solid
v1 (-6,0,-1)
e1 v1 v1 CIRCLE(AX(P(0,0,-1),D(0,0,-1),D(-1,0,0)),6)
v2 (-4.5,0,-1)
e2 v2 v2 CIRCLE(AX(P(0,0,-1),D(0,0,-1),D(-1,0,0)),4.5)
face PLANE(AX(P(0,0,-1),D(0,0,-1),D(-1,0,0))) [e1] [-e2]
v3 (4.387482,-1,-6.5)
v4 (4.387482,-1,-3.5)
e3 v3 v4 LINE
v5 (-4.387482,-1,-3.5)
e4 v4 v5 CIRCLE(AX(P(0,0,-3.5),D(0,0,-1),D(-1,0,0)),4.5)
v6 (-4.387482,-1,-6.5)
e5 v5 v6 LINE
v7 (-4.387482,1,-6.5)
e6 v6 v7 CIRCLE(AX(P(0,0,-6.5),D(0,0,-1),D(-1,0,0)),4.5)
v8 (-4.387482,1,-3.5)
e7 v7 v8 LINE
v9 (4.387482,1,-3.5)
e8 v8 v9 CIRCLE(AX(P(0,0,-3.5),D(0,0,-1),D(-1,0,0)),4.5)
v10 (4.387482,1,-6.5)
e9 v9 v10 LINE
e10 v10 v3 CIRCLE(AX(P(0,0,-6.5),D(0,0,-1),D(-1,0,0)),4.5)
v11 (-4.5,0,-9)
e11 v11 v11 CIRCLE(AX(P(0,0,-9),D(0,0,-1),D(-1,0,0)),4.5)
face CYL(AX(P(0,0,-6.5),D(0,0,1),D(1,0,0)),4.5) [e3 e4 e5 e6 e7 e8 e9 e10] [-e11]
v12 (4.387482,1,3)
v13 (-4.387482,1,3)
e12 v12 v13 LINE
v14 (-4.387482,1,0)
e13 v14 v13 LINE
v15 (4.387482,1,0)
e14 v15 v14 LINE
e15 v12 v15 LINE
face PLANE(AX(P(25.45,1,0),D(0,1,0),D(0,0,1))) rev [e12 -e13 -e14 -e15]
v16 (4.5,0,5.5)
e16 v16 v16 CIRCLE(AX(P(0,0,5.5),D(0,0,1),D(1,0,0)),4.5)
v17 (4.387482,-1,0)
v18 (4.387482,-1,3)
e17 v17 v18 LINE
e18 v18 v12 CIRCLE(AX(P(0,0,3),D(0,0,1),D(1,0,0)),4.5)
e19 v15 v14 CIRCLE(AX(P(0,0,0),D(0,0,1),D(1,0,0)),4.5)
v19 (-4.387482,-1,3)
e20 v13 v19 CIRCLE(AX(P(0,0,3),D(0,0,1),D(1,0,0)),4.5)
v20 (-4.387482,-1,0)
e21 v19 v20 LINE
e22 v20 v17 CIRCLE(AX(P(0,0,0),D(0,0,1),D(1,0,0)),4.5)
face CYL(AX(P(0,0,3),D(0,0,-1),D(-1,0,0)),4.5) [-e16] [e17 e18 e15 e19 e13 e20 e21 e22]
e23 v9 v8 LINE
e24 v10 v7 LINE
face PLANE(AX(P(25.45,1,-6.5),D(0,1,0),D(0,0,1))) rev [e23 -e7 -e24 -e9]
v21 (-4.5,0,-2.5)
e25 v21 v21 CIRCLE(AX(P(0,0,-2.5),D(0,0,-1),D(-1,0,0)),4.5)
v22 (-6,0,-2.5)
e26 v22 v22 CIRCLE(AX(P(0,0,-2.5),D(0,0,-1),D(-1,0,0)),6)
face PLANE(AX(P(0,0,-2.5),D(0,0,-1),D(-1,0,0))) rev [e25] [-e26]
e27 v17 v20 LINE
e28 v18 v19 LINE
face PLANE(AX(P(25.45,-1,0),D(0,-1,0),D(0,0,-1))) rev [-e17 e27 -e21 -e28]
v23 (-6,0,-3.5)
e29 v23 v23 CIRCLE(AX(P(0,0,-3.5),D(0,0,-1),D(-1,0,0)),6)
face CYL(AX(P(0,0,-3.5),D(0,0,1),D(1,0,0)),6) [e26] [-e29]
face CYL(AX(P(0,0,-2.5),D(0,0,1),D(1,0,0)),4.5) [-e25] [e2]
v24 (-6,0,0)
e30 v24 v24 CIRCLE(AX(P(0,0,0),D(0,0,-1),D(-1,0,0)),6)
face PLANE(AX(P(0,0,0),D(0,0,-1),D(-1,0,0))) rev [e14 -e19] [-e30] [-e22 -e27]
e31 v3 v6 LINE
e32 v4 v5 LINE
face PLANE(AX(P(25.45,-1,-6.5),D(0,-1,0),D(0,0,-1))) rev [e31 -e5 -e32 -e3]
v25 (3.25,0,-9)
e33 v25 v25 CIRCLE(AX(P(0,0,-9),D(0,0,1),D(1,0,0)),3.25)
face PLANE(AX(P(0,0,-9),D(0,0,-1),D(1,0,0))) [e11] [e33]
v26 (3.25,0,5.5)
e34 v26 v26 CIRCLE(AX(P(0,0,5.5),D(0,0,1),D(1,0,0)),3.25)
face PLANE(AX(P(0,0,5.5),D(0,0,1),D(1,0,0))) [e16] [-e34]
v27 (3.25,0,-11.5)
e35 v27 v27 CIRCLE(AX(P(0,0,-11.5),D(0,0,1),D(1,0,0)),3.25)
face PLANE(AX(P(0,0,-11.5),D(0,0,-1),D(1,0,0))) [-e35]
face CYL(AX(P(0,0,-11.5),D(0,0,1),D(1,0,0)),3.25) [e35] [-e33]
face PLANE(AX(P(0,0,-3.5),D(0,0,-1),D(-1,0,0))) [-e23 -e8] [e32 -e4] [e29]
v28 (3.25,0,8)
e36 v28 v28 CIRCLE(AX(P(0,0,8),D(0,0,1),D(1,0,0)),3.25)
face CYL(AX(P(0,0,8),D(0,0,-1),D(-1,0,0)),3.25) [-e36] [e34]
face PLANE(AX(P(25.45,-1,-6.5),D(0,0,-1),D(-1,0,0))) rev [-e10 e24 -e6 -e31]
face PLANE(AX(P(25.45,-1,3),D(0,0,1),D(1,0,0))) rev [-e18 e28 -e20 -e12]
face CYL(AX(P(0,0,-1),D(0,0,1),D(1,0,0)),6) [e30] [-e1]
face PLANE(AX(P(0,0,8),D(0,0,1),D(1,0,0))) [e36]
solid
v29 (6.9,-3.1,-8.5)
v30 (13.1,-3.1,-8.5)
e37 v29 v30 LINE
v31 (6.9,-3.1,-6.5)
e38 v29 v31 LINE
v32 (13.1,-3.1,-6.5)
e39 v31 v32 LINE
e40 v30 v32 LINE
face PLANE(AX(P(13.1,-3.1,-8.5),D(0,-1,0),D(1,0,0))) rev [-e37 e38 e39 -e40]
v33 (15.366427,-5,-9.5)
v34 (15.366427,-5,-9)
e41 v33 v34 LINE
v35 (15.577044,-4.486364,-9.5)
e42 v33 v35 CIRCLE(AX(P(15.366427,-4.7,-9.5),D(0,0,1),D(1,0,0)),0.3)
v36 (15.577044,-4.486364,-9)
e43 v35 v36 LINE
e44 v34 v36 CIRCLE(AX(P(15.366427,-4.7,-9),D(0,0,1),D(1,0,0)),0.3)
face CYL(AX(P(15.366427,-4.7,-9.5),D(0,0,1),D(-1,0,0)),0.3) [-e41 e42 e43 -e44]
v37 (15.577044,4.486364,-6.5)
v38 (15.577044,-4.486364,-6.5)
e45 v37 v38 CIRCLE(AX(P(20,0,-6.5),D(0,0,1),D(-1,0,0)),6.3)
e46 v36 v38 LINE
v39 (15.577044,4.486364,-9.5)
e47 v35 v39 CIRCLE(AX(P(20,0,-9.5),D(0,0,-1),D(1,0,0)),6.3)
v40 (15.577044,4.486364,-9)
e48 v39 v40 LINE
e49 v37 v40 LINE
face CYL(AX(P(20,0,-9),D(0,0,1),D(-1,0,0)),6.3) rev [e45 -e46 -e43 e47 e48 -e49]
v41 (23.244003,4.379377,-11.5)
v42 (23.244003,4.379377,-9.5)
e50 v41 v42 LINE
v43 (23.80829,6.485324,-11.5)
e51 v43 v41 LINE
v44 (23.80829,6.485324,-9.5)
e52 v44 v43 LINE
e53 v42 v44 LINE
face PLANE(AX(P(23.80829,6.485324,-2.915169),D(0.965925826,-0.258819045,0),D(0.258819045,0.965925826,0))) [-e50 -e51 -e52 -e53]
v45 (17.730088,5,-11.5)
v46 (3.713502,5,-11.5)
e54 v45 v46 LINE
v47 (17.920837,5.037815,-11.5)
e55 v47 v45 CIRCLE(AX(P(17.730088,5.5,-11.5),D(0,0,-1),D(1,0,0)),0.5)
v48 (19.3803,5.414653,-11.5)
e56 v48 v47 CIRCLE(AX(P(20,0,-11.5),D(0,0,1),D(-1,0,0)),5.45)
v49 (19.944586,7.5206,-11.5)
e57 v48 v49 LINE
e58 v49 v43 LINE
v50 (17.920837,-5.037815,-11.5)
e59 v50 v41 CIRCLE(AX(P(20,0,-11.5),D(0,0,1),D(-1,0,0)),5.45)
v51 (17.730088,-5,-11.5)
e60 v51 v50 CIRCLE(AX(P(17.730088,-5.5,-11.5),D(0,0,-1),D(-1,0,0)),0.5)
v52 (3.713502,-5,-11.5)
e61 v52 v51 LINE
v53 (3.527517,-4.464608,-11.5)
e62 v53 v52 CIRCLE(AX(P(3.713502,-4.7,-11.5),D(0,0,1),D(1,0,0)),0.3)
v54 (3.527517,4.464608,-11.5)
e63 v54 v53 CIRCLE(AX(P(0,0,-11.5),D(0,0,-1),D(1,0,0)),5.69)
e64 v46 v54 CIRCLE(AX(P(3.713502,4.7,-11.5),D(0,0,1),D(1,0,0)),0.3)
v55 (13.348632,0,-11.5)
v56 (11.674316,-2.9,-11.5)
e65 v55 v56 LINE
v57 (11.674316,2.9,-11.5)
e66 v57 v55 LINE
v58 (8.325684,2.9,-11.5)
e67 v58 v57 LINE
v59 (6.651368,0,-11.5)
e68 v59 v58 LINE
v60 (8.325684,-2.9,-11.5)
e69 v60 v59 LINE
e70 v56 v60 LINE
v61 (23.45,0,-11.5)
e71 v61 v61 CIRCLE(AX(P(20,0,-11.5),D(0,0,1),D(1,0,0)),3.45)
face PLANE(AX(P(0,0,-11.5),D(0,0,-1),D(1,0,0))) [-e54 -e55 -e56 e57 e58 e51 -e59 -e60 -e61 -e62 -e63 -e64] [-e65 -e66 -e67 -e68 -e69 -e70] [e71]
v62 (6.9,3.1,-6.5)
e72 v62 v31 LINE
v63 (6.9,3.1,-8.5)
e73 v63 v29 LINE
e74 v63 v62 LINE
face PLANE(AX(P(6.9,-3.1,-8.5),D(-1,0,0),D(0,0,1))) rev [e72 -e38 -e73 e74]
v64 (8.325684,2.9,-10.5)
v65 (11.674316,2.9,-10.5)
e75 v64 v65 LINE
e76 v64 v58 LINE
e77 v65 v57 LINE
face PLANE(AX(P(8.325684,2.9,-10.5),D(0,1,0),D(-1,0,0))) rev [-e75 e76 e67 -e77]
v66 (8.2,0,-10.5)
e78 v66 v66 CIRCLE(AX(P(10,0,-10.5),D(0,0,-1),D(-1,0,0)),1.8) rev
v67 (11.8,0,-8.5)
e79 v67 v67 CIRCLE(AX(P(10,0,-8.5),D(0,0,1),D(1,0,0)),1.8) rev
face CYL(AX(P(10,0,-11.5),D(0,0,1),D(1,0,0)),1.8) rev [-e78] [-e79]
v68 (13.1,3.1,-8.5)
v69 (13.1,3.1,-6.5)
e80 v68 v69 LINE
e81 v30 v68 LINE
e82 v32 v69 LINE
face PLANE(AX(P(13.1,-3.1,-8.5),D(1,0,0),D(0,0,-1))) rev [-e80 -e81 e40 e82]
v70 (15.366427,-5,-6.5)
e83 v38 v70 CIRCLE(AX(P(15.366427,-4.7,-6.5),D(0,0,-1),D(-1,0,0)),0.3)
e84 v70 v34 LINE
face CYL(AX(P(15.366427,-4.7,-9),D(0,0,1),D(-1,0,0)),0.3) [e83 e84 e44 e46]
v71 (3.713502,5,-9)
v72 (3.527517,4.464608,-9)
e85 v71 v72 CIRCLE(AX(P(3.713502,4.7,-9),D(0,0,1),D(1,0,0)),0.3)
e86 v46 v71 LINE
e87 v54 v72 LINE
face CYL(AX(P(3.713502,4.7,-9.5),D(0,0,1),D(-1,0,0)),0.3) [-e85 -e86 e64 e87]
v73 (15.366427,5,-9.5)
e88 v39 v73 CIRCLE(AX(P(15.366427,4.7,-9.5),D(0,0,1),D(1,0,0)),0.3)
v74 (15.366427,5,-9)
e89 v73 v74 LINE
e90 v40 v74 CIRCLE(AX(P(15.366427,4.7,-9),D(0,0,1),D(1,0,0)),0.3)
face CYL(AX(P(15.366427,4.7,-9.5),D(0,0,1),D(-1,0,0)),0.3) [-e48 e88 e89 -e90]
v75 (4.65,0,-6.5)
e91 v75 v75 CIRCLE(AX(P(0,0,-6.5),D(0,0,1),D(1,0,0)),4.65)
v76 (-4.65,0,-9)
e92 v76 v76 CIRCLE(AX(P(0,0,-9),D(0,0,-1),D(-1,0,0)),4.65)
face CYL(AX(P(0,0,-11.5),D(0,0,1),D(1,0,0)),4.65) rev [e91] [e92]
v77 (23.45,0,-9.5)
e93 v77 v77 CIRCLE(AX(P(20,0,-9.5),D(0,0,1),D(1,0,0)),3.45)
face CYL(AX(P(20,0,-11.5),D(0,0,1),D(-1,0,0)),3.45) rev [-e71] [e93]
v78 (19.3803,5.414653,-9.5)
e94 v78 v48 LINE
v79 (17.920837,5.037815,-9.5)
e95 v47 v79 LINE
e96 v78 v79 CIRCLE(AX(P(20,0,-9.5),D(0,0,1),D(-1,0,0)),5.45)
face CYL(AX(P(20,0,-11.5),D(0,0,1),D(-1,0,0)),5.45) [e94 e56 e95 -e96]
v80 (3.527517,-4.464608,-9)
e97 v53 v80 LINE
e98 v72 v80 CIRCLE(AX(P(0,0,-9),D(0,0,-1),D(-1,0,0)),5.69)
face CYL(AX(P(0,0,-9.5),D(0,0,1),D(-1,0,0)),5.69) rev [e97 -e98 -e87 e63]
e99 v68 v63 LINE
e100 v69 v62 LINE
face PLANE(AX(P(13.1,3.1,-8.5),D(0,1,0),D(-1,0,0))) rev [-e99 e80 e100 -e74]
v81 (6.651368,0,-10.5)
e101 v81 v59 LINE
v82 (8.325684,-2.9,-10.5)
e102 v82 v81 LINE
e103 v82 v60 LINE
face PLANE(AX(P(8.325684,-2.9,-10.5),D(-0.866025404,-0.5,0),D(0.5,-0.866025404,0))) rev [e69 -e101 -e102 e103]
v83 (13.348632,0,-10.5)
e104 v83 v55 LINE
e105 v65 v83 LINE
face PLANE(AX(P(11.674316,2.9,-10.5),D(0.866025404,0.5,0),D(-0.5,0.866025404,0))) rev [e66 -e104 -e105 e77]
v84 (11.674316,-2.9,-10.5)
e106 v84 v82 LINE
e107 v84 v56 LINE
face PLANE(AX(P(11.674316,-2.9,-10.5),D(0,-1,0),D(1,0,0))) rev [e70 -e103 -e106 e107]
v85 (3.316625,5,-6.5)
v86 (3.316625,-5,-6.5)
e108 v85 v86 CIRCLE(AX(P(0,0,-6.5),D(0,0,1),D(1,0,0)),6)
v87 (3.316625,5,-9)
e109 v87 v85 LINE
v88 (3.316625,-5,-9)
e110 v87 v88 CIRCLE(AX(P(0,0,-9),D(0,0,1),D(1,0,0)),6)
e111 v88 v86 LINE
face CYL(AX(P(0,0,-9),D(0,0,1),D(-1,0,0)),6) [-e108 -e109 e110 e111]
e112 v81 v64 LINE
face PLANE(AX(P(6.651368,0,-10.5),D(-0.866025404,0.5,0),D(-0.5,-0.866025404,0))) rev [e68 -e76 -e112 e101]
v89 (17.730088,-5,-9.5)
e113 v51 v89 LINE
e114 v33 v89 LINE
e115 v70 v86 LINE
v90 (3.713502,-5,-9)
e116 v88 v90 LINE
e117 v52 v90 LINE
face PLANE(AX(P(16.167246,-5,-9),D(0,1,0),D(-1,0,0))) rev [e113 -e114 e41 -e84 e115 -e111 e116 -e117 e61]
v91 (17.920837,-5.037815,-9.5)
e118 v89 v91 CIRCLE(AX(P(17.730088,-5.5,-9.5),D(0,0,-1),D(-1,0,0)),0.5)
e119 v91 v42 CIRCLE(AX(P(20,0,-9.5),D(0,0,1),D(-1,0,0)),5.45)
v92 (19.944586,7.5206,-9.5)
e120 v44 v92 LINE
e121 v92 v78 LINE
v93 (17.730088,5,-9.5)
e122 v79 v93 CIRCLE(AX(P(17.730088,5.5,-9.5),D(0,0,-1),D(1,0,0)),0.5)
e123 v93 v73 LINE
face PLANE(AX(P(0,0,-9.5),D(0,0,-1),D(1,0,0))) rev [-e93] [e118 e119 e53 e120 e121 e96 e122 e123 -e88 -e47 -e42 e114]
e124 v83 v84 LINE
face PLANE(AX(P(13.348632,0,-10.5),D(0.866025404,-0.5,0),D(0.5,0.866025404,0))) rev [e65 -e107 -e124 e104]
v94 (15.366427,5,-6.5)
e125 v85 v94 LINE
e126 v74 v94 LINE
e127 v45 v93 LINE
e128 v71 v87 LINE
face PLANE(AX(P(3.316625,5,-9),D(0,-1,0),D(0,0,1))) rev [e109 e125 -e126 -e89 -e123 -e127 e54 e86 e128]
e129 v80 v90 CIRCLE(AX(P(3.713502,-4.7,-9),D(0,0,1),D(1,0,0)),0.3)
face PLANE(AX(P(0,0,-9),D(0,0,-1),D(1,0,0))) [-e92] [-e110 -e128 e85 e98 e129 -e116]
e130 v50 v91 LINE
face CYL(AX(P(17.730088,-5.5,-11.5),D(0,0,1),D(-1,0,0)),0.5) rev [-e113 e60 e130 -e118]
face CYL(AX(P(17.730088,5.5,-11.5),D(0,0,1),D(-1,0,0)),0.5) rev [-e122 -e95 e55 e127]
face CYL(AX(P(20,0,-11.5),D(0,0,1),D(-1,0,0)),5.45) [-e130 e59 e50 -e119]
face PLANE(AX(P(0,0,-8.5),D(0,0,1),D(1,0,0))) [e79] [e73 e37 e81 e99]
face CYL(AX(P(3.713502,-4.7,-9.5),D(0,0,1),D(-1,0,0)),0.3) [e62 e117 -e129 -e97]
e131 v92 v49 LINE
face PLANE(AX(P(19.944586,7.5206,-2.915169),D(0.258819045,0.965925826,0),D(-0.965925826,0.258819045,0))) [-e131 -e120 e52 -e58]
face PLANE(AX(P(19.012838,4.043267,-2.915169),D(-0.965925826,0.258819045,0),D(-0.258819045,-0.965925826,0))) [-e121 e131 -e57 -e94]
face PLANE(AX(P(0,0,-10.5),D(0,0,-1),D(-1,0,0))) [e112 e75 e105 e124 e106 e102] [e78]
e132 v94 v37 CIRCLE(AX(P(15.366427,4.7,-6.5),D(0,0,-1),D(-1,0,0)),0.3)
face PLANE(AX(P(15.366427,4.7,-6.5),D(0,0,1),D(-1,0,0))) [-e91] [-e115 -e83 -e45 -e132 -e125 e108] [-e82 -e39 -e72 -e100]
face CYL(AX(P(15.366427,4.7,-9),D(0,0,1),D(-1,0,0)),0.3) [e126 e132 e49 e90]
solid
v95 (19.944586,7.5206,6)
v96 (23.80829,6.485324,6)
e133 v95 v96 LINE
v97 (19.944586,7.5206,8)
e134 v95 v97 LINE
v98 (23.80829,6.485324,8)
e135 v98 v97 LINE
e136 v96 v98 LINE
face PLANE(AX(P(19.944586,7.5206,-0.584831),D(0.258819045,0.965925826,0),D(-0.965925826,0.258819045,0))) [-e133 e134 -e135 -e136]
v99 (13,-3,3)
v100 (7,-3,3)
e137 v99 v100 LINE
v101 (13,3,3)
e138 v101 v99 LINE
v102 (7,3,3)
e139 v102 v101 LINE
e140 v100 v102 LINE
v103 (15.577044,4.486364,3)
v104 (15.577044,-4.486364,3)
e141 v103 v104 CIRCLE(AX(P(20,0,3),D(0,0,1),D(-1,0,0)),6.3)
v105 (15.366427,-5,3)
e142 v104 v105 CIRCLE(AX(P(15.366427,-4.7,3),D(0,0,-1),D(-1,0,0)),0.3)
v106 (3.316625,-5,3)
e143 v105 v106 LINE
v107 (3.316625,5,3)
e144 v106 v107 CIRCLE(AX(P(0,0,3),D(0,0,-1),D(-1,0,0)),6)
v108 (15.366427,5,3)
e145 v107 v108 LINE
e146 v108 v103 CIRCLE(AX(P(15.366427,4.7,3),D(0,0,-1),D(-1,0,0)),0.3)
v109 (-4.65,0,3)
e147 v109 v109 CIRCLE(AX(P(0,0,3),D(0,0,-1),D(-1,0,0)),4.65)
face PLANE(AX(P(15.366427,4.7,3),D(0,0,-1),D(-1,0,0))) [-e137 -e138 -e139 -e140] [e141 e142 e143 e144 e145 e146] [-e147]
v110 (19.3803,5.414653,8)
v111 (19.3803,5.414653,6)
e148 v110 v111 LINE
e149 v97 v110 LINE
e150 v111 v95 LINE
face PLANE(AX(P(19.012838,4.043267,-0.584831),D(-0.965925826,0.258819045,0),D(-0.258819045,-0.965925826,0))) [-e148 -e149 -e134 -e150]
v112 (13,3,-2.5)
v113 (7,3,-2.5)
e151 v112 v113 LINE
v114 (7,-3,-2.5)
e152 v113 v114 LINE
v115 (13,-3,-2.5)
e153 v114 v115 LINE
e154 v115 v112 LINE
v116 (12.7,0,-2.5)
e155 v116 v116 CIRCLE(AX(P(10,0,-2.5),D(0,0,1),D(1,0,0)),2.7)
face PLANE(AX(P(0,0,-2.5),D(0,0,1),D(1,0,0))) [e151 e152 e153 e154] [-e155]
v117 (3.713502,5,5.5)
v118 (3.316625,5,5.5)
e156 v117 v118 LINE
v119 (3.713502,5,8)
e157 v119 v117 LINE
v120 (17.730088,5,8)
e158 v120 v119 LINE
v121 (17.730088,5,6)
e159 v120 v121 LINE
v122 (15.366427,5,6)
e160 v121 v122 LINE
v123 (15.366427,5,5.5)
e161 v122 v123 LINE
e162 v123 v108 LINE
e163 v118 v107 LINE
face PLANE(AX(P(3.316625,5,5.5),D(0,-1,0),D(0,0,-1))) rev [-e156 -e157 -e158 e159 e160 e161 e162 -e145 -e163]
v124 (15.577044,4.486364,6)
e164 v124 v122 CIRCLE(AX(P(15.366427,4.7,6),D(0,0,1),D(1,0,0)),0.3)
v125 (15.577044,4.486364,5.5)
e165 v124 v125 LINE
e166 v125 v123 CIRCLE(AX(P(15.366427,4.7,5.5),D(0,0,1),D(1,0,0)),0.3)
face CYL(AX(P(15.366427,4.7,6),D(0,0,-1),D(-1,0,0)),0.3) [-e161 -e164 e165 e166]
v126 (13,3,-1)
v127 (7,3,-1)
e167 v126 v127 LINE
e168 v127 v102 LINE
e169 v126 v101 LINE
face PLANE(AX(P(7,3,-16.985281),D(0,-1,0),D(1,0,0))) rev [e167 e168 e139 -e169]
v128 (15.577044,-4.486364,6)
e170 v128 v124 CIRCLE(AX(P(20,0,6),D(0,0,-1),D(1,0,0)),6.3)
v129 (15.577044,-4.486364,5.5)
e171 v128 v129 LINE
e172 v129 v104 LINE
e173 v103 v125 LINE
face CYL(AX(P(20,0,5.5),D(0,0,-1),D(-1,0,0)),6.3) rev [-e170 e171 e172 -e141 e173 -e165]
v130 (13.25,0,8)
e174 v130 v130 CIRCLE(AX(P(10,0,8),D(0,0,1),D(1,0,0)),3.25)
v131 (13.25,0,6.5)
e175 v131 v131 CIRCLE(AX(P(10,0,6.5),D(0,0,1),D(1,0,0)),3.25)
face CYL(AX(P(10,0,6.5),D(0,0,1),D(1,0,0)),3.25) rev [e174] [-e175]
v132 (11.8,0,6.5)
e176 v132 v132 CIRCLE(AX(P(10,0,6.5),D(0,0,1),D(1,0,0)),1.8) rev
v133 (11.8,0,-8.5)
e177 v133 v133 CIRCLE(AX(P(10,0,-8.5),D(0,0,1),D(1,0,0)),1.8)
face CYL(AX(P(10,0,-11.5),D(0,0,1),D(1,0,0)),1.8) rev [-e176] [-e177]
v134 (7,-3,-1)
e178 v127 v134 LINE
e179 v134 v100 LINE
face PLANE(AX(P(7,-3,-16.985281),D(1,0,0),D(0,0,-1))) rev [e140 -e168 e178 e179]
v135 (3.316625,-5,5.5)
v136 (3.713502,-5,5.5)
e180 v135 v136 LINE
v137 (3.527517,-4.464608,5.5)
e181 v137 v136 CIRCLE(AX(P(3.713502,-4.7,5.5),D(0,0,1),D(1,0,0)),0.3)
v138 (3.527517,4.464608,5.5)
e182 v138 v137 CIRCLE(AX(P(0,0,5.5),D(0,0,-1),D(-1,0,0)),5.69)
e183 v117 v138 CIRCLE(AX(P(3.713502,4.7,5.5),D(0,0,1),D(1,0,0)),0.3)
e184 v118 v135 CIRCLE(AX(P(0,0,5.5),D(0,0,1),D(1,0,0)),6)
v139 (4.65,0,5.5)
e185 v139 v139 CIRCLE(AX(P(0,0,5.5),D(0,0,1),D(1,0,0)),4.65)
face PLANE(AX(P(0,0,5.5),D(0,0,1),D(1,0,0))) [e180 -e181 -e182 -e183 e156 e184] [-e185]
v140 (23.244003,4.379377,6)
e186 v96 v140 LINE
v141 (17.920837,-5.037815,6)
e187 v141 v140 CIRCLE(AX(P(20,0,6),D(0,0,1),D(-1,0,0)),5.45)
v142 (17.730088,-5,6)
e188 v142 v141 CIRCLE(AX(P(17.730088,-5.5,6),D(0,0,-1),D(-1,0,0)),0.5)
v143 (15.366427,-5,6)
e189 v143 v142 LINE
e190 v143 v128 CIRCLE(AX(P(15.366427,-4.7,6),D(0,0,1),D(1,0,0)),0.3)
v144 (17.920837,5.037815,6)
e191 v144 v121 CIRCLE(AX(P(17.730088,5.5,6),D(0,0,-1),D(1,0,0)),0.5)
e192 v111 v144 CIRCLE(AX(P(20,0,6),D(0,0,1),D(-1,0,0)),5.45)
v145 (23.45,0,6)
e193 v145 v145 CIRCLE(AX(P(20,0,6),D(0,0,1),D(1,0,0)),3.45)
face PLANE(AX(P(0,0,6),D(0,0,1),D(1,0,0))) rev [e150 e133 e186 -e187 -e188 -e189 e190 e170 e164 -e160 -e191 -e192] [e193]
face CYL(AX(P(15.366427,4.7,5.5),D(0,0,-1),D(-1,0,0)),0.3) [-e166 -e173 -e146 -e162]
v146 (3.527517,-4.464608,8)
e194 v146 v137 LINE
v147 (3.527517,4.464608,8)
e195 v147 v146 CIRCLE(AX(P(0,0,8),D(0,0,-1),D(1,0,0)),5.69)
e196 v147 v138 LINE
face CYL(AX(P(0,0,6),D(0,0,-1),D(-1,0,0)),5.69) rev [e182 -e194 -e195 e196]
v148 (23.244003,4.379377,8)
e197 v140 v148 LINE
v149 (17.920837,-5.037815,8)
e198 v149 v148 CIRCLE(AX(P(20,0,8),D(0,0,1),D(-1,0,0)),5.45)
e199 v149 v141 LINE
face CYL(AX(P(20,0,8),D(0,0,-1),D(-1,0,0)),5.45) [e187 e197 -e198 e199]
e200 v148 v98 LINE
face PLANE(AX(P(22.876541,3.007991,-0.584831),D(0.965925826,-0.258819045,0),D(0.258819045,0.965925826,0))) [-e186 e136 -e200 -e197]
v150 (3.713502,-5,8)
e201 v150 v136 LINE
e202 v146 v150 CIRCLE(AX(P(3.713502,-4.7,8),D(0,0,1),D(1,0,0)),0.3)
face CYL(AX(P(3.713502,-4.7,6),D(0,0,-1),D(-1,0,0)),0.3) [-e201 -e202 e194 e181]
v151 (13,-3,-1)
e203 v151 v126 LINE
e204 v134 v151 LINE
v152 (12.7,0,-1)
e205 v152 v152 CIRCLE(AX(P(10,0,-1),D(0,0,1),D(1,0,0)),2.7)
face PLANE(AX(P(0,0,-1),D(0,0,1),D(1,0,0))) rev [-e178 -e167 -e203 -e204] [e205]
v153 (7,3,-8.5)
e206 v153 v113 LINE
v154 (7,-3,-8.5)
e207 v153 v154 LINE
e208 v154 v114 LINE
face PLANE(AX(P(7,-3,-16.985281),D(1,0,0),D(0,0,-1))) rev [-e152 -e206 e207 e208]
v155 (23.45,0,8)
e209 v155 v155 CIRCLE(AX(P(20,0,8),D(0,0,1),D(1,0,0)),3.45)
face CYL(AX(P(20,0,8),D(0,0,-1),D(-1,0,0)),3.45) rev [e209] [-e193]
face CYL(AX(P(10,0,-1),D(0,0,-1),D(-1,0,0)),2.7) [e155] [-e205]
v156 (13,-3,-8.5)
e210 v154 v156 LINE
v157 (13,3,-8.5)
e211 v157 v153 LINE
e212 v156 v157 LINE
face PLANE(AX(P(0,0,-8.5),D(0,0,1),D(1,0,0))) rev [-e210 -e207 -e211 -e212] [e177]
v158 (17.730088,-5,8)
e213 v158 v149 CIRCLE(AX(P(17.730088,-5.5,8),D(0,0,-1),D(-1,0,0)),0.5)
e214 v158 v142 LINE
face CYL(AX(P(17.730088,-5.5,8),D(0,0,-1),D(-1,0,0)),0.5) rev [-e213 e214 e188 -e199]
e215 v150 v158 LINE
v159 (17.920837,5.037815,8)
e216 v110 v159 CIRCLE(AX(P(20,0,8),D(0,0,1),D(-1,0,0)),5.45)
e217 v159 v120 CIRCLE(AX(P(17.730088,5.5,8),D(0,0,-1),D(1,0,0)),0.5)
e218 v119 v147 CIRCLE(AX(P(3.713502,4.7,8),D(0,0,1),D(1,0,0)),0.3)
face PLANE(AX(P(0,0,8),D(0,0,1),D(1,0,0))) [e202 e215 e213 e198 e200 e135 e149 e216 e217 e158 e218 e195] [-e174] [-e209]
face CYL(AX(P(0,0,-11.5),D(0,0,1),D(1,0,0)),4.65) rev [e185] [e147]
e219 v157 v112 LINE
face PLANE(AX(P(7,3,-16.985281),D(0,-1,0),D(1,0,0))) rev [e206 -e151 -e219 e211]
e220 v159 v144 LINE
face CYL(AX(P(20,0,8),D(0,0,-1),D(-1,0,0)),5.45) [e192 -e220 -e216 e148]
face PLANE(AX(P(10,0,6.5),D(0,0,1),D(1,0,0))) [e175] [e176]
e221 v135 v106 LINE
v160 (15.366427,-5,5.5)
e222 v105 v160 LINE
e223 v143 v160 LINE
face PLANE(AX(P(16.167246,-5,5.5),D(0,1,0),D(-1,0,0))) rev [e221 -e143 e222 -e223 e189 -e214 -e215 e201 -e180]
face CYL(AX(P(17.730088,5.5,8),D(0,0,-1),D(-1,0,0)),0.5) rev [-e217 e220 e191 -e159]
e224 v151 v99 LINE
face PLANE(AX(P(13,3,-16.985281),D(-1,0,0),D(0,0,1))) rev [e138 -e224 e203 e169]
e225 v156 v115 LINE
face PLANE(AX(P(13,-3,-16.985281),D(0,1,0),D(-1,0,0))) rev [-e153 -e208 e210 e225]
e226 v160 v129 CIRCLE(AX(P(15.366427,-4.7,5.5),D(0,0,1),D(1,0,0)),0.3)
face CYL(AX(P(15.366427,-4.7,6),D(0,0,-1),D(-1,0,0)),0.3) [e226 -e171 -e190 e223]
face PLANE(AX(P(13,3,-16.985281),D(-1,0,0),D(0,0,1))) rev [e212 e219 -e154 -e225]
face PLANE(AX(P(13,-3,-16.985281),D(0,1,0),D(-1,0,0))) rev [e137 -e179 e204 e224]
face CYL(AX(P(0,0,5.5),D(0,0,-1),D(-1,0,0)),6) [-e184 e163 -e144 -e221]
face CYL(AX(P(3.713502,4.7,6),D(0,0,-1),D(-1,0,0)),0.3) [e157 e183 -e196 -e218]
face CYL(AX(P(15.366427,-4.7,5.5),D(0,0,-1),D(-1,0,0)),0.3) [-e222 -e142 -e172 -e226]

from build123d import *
from build123d.topology import SkipClean

# Parameters (mm, degrees)
SKETCH_1_R                   = 4.5
EXTRUDE_1_DEPTH              = 3
SKETCH_2_R                   = 6
EXTRUDE_2_DEPTH              = 1
EXTRUDE_START                = 1.5
SKETCH_3_R                   = 4.5
EXTRUDE_3_DEPTH              = 1.5
SKETCH_4_R                   = 6
EXTRUDE_4_DEPTH              = 1
EXTRUDE_START_2              = 3
SKETCH_5_R                   = 4.5
EXTRUDE_5_DEPTH              = 3
SKETCH_6_R                   = 6
EXTRUDE_6_DEPTH              = 1
EXTRUDE_START_3              = 1
SKETCH_7_R                   = 6
EXTRUDE_7_DEPTH              = 1
SKETCH_10_R                  = 4.25
EXTRUDE_10_DEPTH             = 1.5
SKETCH_11_R                  = 3.25
EXTRUDE_11_DEPTH             = 2.5
SKETCH_12_R                  = 4.39
EXTRUDE_12_DEPTH             = 1.5
EXTRUDE_13_DEPTH             = 0.5
FILLET_START                 = 3
FILLET_9_DEPTH               = 2.5
SKETCH_14_R                  = 3.45
EXTRUDE_14_DEPTH             = 2
EXTRUDE_15_DEPTH             = 1
SKETCH_16_R                  = 1.8
CUT_EXTRUDE_1_DEPTH          = 33.61828475
SKETCH_17_W                  = 6.2
SKETCH_17_H                  = 6.2
CUT_EXTRUDE_2_DEPTH          = 2
SKETCH_18_W                  = 6
SKETCH_18_H                  = 6
EXTRUDE_16_DEPTH             = 11.5
SKETCH_19_R                  = 1.8
CUT_EXTRUDE_3_DEPTH          = 30.899038446
CUT_EXTRUDE_4_DEPTH          = 0.75
CUT_EXTRUDE_4_DEPTH_BACK     = 0.75
SKETCH_20_W                  = 6
SKETCH_20_H                  = 6
SKETCH_20_R                  = 2.7
SKETCH_21_R                  = 3.25
CUT_EXTRUDE_5_DEPTH          = 1.5
CUT_EXTRUDE_6_DEPTH          = 1
EXTRUDE_17_DEPTH             = 2
EXTRUDE_18_DEPTH             = 2
SKETCH_26_R                  = 6
SKETCH_26_R_2                = 5.8
CUT_EXTRUDE_8_DEPTH          = 31.240898289
SKETCH_27_R                  = 6
SKETCH_27_R_2                = 5.8
CUT_EXTRUDE_9_DEPTH          = 31.240898289
SKETCH_28_R                  = 5.8
SKETCH_28_R_2                = 4.25
CUT_EXTRUDE_10_DEPTH         = 1
CUT_EXTRUDE_START            = 1
SKETCH_29_R                  = 5.8
SKETCH_29_R_2                = 4.25
CUT_EXTRUDE_11_DEPTH         = 1
SKETCH_30_R                  = 4.39
EXTRUDE_19_DEPTH             = 1
SKETCH_31_R                  = 4.39
EXTRUDE_20_DEPTH             = 1
CUT_EXTRUDE_START_2          = -14.5
CUT_EXTRUDE_12_OUTLINE_R     = 4.65
CUT_EXTRUDE_12_OUTLINE_R_2   = 4.39
CUT_EXTRUDE_12_DEPTH         = 2.5
CUT_EXTRUDE_START_3          = -2.5
CUT_EXTRUDE_12_2_OUTLINE_R   = 4.65
CUT_EXTRUDE_12_2_OUTLINE_R_2 = 4.39
CUT_EXTRUDE_12_2_DEPTH       = 2.5
SKETCH_33_R                  = 4.5
SKETCH_33_R_2                = 4.25
EXTRUDE_21_DEPTH             = 2.5
EXTRUDE_START_4              = 2.5
SKETCH_34_R                  = 4.5
SKETCH_34_R_2                = 4.25
EXTRUDE_22_DEPTH             = 2.5
SKETCH_25_W                  = 3
SKETCH_25_H                  = 2
CUT_EXTRUDE_13_DEPTH         = 33.951660494


with BuildPart() as part:
    # ｽｹｯﾁ1 → ﾎﾞｽ - 押し出し1 (new body)
    with BuildSketch(Plane.XY):
        Circle(SKETCH_1_R)
    extrude(amount=EXTRUDE_1_DEPTH)

    # ｽｹｯﾁ2 → ﾎﾞｽ - 押し出し2 (add)
    with BuildSketch(Plane(origin=(0, 0, 0), x_dir=(-1, 0, 0), z_dir=(0, 0, -1))):
        Circle(SKETCH_2_R)
    extrude(amount=EXTRUDE_2_DEPTH)

    # ｽｹｯﾁ3 → ﾎﾞｽ - 押し出し3 (add)
    with BuildSketch(Plane(origin=(0, 0, -1), x_dir=(-1, 0, 0), z_dir=(0, 0, -1)).offset(EXTRUDE_START)):
        with Locations(Location((0, 0, 0), (0, 0, 180))):
            Circle(SKETCH_3_R)
    extrude(amount=-EXTRUDE_3_DEPTH)

    # ｽｹｯﾁ4 → ﾎﾞｽ - 押し出し4 (add)
    with BuildSketch(Plane(origin=(0, 0, -2.5), x_dir=(-1, 0, 0), z_dir=(0, 0, -1))):
        Circle(SKETCH_4_R)
    extrude(amount=EXTRUDE_4_DEPTH)

    # ｽｹｯﾁ5 → ﾎﾞｽ - 押し出し5 (add)
    with BuildSketch(Plane(origin=(0, 0, -3.5), x_dir=(-1, 0, 0), z_dir=(0, 0, -1)).offset(EXTRUDE_START_2)):
        with Locations(Location((0, 0, 0), (0, 0, 180))):
            Circle(SKETCH_5_R)
    extrude(amount=-EXTRUDE_5_DEPTH)

    # ｽｹｯﾁ6 → ﾎﾞｽ - 押し出し6 (add)
    with BuildSketch(Plane(origin=(0, 0, -6.5), x_dir=(-1, 0, 0), z_dir=(0, 0, -1))):
        Circle(SKETCH_6_R)
    extrude(amount=EXTRUDE_6_DEPTH)

    # ｽｹｯﾁ7 → ﾎﾞｽ - 押し出し7 (add)
    with BuildSketch(Plane.XY.offset(3).offset(EXTRUDE_START_3)):
        with Locations(Location((0, 0, 0), (0, 0, 180))):
            Circle(SKETCH_7_R)
    extrude(amount=-EXTRUDE_7_DEPTH)

    # ｽｹｯﾁ10 → ﾎﾞｽ - 押し出し10 (add)
    with BuildSketch(Plane.XY.offset(4)):
        Circle(SKETCH_10_R)
    extrude_10 = extrude(amount=EXTRUDE_10_DEPTH)

    # ｽｹｯﾁ11 → ﾎﾞｽ - 押し出し11 (add)
    with BuildSketch(Plane.XY.offset(5.5)):
        Circle(SKETCH_11_R)
    extrude_11 = extrude(amount=EXTRUDE_11_DEPTH)

    # ﾐﾗｰ1: ﾎﾞｽ - 押し出し10, ﾎﾞｽ - 押し出し11 across plane
    add(extrude_10.mirror(Plane.XY.offset(-1.75)))
    add(extrude_11.mirror(Plane.XY.offset(-1.75)))

    # ｽｹｯﾁ26 → ｶｯﾄ - 押し出し8 (cut, through all)
    with BuildSketch(Plane(origin=(0, 0, 3), x_dir=(-1, 0, 0), z_dir=(0, 0, -1))):
        Circle(SKETCH_26_R)
        Circle(SKETCH_26_R_2, mode=Mode.SUBTRACT)
    extrude(amount=-CUT_EXTRUDE_8_DEPTH, mode=Mode.SUBTRACT)

    # ｽｹｯﾁ27 → ｶｯﾄ - 押し出し9 (cut, through all)
    with BuildSketch(Plane.XY.offset(-6.5)):
        with Locations(Location((0, 0, 0), (0, 0, 180))):
            Circle(SKETCH_27_R)
        with Locations(Location((0, 0, 0), (0, 0, 180))):
            Circle(SKETCH_27_R_2, mode=Mode.SUBTRACT)
    extrude(amount=-CUT_EXTRUDE_9_DEPTH, mode=Mode.SUBTRACT)

    # ｽｹｯﾁ28 → ｶｯﾄ - 押し出し10 (cut)
    with BuildSketch(Plane(origin=(0, 0, 4), x_dir=(-1, 0, 0), z_dir=(0, 0, -1))):
        with Locations(Location((0, 0, 0), (0, 0, 180))):
            Circle(SKETCH_28_R)
        with Locations(Location((0, 0, 0), (0, 0, 180))):
            Circle(SKETCH_28_R_2, mode=Mode.SUBTRACT)
    extrude(amount=CUT_EXTRUDE_10_DEPTH, mode=Mode.SUBTRACT)

    # ｽｹｯﾁ29 → ｶｯﾄ - 押し出し11 (cut)
    with BuildSketch(Plane.XY.offset(-7.5).offset(CUT_EXTRUDE_START)):
        Circle(SKETCH_29_R)
        with Locations(Location((0, 0, 0), (0, 0, 180))):
            Circle(SKETCH_29_R_2, mode=Mode.SUBTRACT)
    extrude(amount=-CUT_EXTRUDE_11_DEPTH, mode=Mode.SUBTRACT)

    # ｽｹｯﾁ33 → ﾎﾞｽ - 押し出し21 (add)
    with BuildSketch(Plane.XY.offset(3)):
        Circle(SKETCH_33_R)
        Circle(SKETCH_33_R_2, mode=Mode.SUBTRACT)
    extrude(amount=EXTRUDE_21_DEPTH)

    # ｽｹｯﾁ34 → ﾎﾞｽ - 押し出し22 (add)
    with BuildSketch(Plane(origin=(0, 0, -6.5), x_dir=(-1, 0, 0), z_dir=(0, 0, -1)).offset(EXTRUDE_START_4)):
        with Locations(Location((0, 0, 0), (0, 0, 180))):
            Circle(SKETCH_34_R)
        Circle(SKETCH_34_R_2, mode=Mode.SUBTRACT)
    extrude(amount=-EXTRUDE_22_DEPTH)

    # ｽｹｯﾁ25 → ｶｯﾄ - 押し出し13 (cut, through all)
    with BuildSketch(Plane.ZY.offset(4.5)):
        with Locations((-5, 0)):
            Rectangle(SKETCH_25_W, SKETCH_25_H)
        with Locations((1.5, 0)):
            Rectangle(SKETCH_25_W, SKETCH_25_H)
    extrude(amount=-CUT_EXTRUDE_13_DEPTH, mode=Mode.SUBTRACT)


with BuildPart() as body_2:
    # ｽｹｯﾁ12 → ﾎﾞｽ - 押し出し12 (new body)
    with BuildSketch(Plane.XY.offset(4)):
        with BuildLine():
            Line((3.31662479, 5), (16.167246421, 5))
            ThreePointArc((16.167246421, 5), (13.7, 0), (16.167246421, -5))
            Line((16.167246421, -5), (3.31662479, -5))
            ThreePointArc((3.31662479, -5), (-6, 0), (3.31662479, 5))
        make_face()
        Circle(SKETCH_12_R, mode=Mode.SUBTRACT)
    extrude(amount=EXTRUDE_12_DEPTH)

    # ｽｹｯﾁ13 → ﾎﾞｽ - 押し出し13 (add)
    with BuildSketch(Plane.XY.offset(5.5)):
        with BuildLine():
            Line((15.366426865, 5), (3.71350239, 5))
            ThreePointArc((3.71350239, 5), (3.430114232, 4.798443648), (3.527517295, 4.464607679))
            ThreePointArc((3.527517295, 4.464607679), (5.69, 0), (3.527517295, -4.464607679))
            ThreePointArc((3.527517295, -4.464607679), (3.430114232, -4.798443648), (3.71350239, -5))
            Line((3.71350239, -5), (15.366426865, -5))
            ThreePointArc((15.366426865, -5), (15.643997495, -4.813818037), (15.577043825, -4.486363636))
            ThreePointArc((15.577043825, -4.486363636), (13.7, 0), (15.577043825, 4.486363636))
            ThreePointArc((15.577043825, 4.486363636), (15.643997495, 4.813818037), (15.366426865, 5))
        make_face()
    extrude(amount=EXTRUDE_13_DEPTH)

    # ﾌｨﾚｯﾄ9: read off the stored shape, not the designer's step
    # ﾌｨﾚｯﾄ9 outline → ﾌｨﾚｯﾄ9 (cut)
    with BuildSketch(Plane.XY.offset(FILLET_START)):
        with BuildLine():
            ThreePointArc((16.167246421, -5), (15.864163753, -4.752352947), (15.577043825, -4.486363636))
            ThreePointArc((15.577043825, -4.486363636), (15.643997495, -4.813818036), (15.366426865, -5))
            Line((15.366426865, -5), (16.167246421, -5))
        make_face()
        with BuildLine():
            ThreePointArc((15.366426865, 5), (15.643997495, 4.813818036), (15.577043825, 4.486363636))
            ThreePointArc((15.577043825, 4.486363636), (15.864163753, 4.752352947), (16.167246421, 5))
            Line((16.167246421, 5), (15.366426865, 5))
        make_face()
    extrude(amount=FILLET_9_DEPTH, mode=Mode.SUBTRACT)

    # ｽｹｯﾁ14 → ﾎﾞｽ - 押し出し14 (add)
    with BuildSketch(Plane.XY.offset(6)):
        with BuildLine():
            Line((3.71350239, 5), (17.730088107, 5))
            ThreePointArc((17.730088107, 5), (17.827318666, 5.009544886), (17.920837006, 5.037815126))
            ThreePointArc((17.920837006, 5.037815126), (25.45, 0), (17.920837006, -5.037815126))
            ThreePointArc((17.920837006, -5.037815126), (17.827318666, -5.009544886), (17.730088107, -5))
            Line((17.730088107, -5), (3.71350239, -5))
            ThreePointArc((3.71350239, -5), (3.430114232, -4.798443648), (3.527517295, -4.464607679))
            ThreePointArc((3.527517295, -4.464607679), (5.69, 0), (3.527517295, 4.464607679))
            ThreePointArc((3.527517295, 4.464607679), (3.430114232, 4.798443648), (3.71350239, 5))
        make_face()
        with Locations((20, 0)):
            Circle(SKETCH_14_R, mode=Mode.SUBTRACT)
    extrude(amount=EXTRUDE_14_DEPTH)

    # ｽｹｯﾁ15 → ﾎﾞｽ - 押し出し15 (add)
    with BuildSketch(Plane(origin=(0, 0, 4), x_dir=(-1, 0, 0), z_dir=(0, 0, -1))):
        with BuildLine():
            Line((-15.366426865, 5), (-4.195235393, 5))
            ThreePointArc((-4.195235393, 5), (-3.914929437, 4.806904497), (-3.995462279, 4.476190476))
            ThreePointArc((-3.995462279, 4.476190476), (-6, 0), (-3.995462279, -4.476190476))
            ThreePointArc((-3.995462279, -4.476190476), (-3.914929437, -4.806904497), (-4.195235393, -5))
            Line((-4.195235393, -5), (-15.366426865, -5))
            ThreePointArc((-15.366426865, -5), (-15.643997495, -4.813818037), (-15.577043825, -4.486363636))
            ThreePointArc((-15.577043825, -4.486363636), (-13.7, 0), (-15.577043825, 4.486363636))
            ThreePointArc((-15.577043825, 4.486363636), (-15.643997495, 4.813818037), (-15.366426865, 5))
        make_face()
    extrude(amount=EXTRUDE_15_DEPTH)


with BuildPart() as body_3:
    # ﾐﾗｰ2: mirrored copy
    add(body_2.part.mirror(Plane.XY.offset(-1.75)))


with BuildPart() as cut_extrude_1_tool:
    # ｽｹｯﾁ16 → ｶｯﾄ - 押し出し1 (new, through all)
    with BuildSketch(Plane.XY.offset(8)):
        with Locations((10, 0)):
            Circle(SKETCH_16_R)
    extrude(amount=-CUT_EXTRUDE_1_DEPTH)


with BuildPart() as body_2_1:
    add(body_2.part)

    # ｶｯﾄ - 押し出し1: cut by cut_extrude_1_tool
    add(cut_extrude_1_tool.part, mode=Mode.SUBTRACT)

    # ｽｹｯﾁ18 → ﾎﾞｽ - 押し出し16 (add)
    with BuildSketch(Plane(origin=(0, 0, 3), x_dir=(-1, 0, 0), z_dir=(0, 0, -1))):
        with Locations((-10, 0)):
            Rectangle(SKETCH_18_W, SKETCH_18_H)
    extrude(amount=EXTRUDE_16_DEPTH)

    # ｽｹｯﾁ19 → ｶｯﾄ - 押し出し3 (cut, through all)
    with BuildSketch(Plane.XY.offset(3)):
        with Locations((10, 0)):
            Circle(SKETCH_19_R)
    extrude(amount=-CUT_EXTRUDE_3_DEPTH, mode=Mode.SUBTRACT)

    # ｽｹｯﾁ20 → ｶｯﾄ - 押し出し4 (cut, two sides: drawn at the far end of the back side and taken through both)
    with BuildSketch(Plane.XY.offset(-1.75).offset(-CUT_EXTRUDE_4_DEPTH_BACK)):
        with Locations((10, 0)):
            Rectangle(SKETCH_20_W, SKETCH_20_H)
        with Locations((10, 0)):
            Circle(SKETCH_20_R, mode=Mode.SUBTRACT)
    extrude(amount=CUT_EXTRUDE_4_DEPTH + CUT_EXTRUDE_4_DEPTH_BACK, mode=Mode.SUBTRACT)

    # ｽｹｯﾁ21 → ｶｯﾄ - 押し出し5 (cut)
    with BuildSketch(Plane.XY.offset(8)):
        with Locations((10, 0)):
            Circle(SKETCH_21_R)
    extrude(amount=-CUT_EXTRUDE_5_DEPTH, mode=Mode.SUBTRACT)

    # ｽｹｯﾁ23 → ﾎﾞｽ - 押し出し17 (add)
    with BuildSketch(Plane.XY.offset(8)):
        Polygon((19.012837862, 4.043267356), (22.876541167, 3.007991176), (23.80828973, 6.48532415), (19.944586424, 7.520600331), align=None)
    extrude(amount=-EXTRUDE_17_DEPTH)

    # ｽｹｯﾁ30 → ﾎﾞｽ - 押し出し19 (add)
    with BuildSketch(Plane(origin=(0, 0, 4), x_dir=(-1, 0, 0), z_dir=(0, 0, -1))):
        with BuildLine():
            Line((-4.195235393, -5), (-3.31662479, -5))
            ThreePointArc((-3.31662479, -5), (6, 0), (-3.31662479, 5))
            Line((-3.31662479, 5), (-4.195235393, 5))
            ThreePointArc((-4.195235393, 5), (-3.914929437, 4.806904497), (-3.995462279, 4.476190476))
            ThreePointArc((-3.995462279, 4.476190476), (-6, 0), (-3.995462279, -4.476190476))
            ThreePointArc((-3.995462279, -4.476190476), (-3.914929437, -4.806904497), (-4.195235393, -5))
        make_face()
        with Locations(Location((0, 0, 0), (0, 0, 180))):
            Circle(SKETCH_30_R, mode=Mode.SUBTRACT)
    extrude(amount=EXTRUDE_19_DEPTH)

    # Cut-Extrude 12 2 outline → Cut-Extrude 12 2 (cut)
    with BuildSketch(Plane.XY.offset(5.5).offset(CUT_EXTRUDE_START_3)):
        Circle(CUT_EXTRUDE_12_2_OUTLINE_R)
        Circle(CUT_EXTRUDE_12_2_OUTLINE_R_2, mode=Mode.SUBTRACT)
    extrude(amount=CUT_EXTRUDE_12_2_DEPTH, mode=Mode.SUBTRACT)


with BuildPart() as body_3_1:
    add(body_3.part)

    # ｶｯﾄ - 押し出し1: cut by cut_extrude_1_tool
    add(cut_extrude_1_tool.part, mode=Mode.SUBTRACT)

    # ｽｹｯﾁ17 → ｶｯﾄ - 押し出し2 (cut)
    with BuildSketch(Plane.XY.offset(-6.5)):
        with Locations((10, 0)):
            Rectangle(SKETCH_17_W, SKETCH_17_H)
    extrude(amount=-CUT_EXTRUDE_2_DEPTH, mode=Mode.SUBTRACT)

    # ｽｹｯﾁ22 → ｶｯﾄ - 押し出し6 (cut)
    with BuildSketch(Plane(origin=(0, 0, -11.5), x_dir=(-1, 0, 0), z_dir=(0, 0, -1))):
        Polygon((-11.674315781, 2.9), (-13.348631561, 0), (-11.674315781, -2.9), (-8.325684219, -2.9), (-6.651368439, 0), (-8.325684219, 2.9), align=None)
    extrude(amount=-CUT_EXTRUDE_6_DEPTH, mode=Mode.SUBTRACT)

    # ｽｹｯﾁ24 → ﾎﾞｽ - 押し出し18 (add)
    with BuildSketch(Plane(origin=(0, 0, -11.5), x_dir=(-1, 0, 0), z_dir=(0, 0, -1))):
        Polygon((-22.876541167, 3.007991176), (-19.012837862, 4.043267356), (-19.944586424, 7.520600331), (-23.80828973, 6.48532415), align=None)
    extrude(amount=-EXTRUDE_18_DEPTH)

    # ｽｹｯﾁ31 → ﾎﾞｽ - 押し出し20 (add)
    with SkipClean():  # the faces are left unmerged after this step: merging them gives an invalid solid
        with BuildSketch(Plane.XY.offset(-7.5).offset(EXTRUDE_START_3)):
            with BuildLine():
                Line((3.31662479, -5), (4.195235393, -5))
                ThreePointArc((4.195235393, -5), (3.914929437, -4.806904497), (3.995462279, -4.476190476))
                ThreePointArc((3.995462279, -4.476190476), (6, 0), (3.995462279, 4.476190476))
                ThreePointArc((3.995462279, 4.476190476), (3.914929437, 4.806904497), (4.195235393, 5))
                Line((4.195235393, 5), (3.31662479, 5))
                ThreePointArc((3.31662479, 5), (-6, 0), (3.31662479, -5))
            make_face()
            Circle(SKETCH_31_R, mode=Mode.SUBTRACT)
        extrude(amount=-EXTRUDE_20_DEPTH)

    # ｶｯﾄ - 押し出し12: read off the stored shape, not the designer's step
    # ｶｯﾄ - 押し出し12 outline → ｶｯﾄ - 押し出し12 (cut)
    with SkipClean():  # the faces are left unmerged after this step: merging them gives an invalid solid
        with BuildSketch(Plane.XY.offset(5.5).offset(CUT_EXTRUDE_START_2)):
            Circle(CUT_EXTRUDE_12_OUTLINE_R)
            Circle(CUT_EXTRUDE_12_OUTLINE_R_2, mode=Mode.SUBTRACT)
        extrude(amount=CUT_EXTRUDE_12_DEPTH, mode=Mode.SUBTRACT)


solid = Compound([part.part, body_2_1.part, body_3_1.part])
